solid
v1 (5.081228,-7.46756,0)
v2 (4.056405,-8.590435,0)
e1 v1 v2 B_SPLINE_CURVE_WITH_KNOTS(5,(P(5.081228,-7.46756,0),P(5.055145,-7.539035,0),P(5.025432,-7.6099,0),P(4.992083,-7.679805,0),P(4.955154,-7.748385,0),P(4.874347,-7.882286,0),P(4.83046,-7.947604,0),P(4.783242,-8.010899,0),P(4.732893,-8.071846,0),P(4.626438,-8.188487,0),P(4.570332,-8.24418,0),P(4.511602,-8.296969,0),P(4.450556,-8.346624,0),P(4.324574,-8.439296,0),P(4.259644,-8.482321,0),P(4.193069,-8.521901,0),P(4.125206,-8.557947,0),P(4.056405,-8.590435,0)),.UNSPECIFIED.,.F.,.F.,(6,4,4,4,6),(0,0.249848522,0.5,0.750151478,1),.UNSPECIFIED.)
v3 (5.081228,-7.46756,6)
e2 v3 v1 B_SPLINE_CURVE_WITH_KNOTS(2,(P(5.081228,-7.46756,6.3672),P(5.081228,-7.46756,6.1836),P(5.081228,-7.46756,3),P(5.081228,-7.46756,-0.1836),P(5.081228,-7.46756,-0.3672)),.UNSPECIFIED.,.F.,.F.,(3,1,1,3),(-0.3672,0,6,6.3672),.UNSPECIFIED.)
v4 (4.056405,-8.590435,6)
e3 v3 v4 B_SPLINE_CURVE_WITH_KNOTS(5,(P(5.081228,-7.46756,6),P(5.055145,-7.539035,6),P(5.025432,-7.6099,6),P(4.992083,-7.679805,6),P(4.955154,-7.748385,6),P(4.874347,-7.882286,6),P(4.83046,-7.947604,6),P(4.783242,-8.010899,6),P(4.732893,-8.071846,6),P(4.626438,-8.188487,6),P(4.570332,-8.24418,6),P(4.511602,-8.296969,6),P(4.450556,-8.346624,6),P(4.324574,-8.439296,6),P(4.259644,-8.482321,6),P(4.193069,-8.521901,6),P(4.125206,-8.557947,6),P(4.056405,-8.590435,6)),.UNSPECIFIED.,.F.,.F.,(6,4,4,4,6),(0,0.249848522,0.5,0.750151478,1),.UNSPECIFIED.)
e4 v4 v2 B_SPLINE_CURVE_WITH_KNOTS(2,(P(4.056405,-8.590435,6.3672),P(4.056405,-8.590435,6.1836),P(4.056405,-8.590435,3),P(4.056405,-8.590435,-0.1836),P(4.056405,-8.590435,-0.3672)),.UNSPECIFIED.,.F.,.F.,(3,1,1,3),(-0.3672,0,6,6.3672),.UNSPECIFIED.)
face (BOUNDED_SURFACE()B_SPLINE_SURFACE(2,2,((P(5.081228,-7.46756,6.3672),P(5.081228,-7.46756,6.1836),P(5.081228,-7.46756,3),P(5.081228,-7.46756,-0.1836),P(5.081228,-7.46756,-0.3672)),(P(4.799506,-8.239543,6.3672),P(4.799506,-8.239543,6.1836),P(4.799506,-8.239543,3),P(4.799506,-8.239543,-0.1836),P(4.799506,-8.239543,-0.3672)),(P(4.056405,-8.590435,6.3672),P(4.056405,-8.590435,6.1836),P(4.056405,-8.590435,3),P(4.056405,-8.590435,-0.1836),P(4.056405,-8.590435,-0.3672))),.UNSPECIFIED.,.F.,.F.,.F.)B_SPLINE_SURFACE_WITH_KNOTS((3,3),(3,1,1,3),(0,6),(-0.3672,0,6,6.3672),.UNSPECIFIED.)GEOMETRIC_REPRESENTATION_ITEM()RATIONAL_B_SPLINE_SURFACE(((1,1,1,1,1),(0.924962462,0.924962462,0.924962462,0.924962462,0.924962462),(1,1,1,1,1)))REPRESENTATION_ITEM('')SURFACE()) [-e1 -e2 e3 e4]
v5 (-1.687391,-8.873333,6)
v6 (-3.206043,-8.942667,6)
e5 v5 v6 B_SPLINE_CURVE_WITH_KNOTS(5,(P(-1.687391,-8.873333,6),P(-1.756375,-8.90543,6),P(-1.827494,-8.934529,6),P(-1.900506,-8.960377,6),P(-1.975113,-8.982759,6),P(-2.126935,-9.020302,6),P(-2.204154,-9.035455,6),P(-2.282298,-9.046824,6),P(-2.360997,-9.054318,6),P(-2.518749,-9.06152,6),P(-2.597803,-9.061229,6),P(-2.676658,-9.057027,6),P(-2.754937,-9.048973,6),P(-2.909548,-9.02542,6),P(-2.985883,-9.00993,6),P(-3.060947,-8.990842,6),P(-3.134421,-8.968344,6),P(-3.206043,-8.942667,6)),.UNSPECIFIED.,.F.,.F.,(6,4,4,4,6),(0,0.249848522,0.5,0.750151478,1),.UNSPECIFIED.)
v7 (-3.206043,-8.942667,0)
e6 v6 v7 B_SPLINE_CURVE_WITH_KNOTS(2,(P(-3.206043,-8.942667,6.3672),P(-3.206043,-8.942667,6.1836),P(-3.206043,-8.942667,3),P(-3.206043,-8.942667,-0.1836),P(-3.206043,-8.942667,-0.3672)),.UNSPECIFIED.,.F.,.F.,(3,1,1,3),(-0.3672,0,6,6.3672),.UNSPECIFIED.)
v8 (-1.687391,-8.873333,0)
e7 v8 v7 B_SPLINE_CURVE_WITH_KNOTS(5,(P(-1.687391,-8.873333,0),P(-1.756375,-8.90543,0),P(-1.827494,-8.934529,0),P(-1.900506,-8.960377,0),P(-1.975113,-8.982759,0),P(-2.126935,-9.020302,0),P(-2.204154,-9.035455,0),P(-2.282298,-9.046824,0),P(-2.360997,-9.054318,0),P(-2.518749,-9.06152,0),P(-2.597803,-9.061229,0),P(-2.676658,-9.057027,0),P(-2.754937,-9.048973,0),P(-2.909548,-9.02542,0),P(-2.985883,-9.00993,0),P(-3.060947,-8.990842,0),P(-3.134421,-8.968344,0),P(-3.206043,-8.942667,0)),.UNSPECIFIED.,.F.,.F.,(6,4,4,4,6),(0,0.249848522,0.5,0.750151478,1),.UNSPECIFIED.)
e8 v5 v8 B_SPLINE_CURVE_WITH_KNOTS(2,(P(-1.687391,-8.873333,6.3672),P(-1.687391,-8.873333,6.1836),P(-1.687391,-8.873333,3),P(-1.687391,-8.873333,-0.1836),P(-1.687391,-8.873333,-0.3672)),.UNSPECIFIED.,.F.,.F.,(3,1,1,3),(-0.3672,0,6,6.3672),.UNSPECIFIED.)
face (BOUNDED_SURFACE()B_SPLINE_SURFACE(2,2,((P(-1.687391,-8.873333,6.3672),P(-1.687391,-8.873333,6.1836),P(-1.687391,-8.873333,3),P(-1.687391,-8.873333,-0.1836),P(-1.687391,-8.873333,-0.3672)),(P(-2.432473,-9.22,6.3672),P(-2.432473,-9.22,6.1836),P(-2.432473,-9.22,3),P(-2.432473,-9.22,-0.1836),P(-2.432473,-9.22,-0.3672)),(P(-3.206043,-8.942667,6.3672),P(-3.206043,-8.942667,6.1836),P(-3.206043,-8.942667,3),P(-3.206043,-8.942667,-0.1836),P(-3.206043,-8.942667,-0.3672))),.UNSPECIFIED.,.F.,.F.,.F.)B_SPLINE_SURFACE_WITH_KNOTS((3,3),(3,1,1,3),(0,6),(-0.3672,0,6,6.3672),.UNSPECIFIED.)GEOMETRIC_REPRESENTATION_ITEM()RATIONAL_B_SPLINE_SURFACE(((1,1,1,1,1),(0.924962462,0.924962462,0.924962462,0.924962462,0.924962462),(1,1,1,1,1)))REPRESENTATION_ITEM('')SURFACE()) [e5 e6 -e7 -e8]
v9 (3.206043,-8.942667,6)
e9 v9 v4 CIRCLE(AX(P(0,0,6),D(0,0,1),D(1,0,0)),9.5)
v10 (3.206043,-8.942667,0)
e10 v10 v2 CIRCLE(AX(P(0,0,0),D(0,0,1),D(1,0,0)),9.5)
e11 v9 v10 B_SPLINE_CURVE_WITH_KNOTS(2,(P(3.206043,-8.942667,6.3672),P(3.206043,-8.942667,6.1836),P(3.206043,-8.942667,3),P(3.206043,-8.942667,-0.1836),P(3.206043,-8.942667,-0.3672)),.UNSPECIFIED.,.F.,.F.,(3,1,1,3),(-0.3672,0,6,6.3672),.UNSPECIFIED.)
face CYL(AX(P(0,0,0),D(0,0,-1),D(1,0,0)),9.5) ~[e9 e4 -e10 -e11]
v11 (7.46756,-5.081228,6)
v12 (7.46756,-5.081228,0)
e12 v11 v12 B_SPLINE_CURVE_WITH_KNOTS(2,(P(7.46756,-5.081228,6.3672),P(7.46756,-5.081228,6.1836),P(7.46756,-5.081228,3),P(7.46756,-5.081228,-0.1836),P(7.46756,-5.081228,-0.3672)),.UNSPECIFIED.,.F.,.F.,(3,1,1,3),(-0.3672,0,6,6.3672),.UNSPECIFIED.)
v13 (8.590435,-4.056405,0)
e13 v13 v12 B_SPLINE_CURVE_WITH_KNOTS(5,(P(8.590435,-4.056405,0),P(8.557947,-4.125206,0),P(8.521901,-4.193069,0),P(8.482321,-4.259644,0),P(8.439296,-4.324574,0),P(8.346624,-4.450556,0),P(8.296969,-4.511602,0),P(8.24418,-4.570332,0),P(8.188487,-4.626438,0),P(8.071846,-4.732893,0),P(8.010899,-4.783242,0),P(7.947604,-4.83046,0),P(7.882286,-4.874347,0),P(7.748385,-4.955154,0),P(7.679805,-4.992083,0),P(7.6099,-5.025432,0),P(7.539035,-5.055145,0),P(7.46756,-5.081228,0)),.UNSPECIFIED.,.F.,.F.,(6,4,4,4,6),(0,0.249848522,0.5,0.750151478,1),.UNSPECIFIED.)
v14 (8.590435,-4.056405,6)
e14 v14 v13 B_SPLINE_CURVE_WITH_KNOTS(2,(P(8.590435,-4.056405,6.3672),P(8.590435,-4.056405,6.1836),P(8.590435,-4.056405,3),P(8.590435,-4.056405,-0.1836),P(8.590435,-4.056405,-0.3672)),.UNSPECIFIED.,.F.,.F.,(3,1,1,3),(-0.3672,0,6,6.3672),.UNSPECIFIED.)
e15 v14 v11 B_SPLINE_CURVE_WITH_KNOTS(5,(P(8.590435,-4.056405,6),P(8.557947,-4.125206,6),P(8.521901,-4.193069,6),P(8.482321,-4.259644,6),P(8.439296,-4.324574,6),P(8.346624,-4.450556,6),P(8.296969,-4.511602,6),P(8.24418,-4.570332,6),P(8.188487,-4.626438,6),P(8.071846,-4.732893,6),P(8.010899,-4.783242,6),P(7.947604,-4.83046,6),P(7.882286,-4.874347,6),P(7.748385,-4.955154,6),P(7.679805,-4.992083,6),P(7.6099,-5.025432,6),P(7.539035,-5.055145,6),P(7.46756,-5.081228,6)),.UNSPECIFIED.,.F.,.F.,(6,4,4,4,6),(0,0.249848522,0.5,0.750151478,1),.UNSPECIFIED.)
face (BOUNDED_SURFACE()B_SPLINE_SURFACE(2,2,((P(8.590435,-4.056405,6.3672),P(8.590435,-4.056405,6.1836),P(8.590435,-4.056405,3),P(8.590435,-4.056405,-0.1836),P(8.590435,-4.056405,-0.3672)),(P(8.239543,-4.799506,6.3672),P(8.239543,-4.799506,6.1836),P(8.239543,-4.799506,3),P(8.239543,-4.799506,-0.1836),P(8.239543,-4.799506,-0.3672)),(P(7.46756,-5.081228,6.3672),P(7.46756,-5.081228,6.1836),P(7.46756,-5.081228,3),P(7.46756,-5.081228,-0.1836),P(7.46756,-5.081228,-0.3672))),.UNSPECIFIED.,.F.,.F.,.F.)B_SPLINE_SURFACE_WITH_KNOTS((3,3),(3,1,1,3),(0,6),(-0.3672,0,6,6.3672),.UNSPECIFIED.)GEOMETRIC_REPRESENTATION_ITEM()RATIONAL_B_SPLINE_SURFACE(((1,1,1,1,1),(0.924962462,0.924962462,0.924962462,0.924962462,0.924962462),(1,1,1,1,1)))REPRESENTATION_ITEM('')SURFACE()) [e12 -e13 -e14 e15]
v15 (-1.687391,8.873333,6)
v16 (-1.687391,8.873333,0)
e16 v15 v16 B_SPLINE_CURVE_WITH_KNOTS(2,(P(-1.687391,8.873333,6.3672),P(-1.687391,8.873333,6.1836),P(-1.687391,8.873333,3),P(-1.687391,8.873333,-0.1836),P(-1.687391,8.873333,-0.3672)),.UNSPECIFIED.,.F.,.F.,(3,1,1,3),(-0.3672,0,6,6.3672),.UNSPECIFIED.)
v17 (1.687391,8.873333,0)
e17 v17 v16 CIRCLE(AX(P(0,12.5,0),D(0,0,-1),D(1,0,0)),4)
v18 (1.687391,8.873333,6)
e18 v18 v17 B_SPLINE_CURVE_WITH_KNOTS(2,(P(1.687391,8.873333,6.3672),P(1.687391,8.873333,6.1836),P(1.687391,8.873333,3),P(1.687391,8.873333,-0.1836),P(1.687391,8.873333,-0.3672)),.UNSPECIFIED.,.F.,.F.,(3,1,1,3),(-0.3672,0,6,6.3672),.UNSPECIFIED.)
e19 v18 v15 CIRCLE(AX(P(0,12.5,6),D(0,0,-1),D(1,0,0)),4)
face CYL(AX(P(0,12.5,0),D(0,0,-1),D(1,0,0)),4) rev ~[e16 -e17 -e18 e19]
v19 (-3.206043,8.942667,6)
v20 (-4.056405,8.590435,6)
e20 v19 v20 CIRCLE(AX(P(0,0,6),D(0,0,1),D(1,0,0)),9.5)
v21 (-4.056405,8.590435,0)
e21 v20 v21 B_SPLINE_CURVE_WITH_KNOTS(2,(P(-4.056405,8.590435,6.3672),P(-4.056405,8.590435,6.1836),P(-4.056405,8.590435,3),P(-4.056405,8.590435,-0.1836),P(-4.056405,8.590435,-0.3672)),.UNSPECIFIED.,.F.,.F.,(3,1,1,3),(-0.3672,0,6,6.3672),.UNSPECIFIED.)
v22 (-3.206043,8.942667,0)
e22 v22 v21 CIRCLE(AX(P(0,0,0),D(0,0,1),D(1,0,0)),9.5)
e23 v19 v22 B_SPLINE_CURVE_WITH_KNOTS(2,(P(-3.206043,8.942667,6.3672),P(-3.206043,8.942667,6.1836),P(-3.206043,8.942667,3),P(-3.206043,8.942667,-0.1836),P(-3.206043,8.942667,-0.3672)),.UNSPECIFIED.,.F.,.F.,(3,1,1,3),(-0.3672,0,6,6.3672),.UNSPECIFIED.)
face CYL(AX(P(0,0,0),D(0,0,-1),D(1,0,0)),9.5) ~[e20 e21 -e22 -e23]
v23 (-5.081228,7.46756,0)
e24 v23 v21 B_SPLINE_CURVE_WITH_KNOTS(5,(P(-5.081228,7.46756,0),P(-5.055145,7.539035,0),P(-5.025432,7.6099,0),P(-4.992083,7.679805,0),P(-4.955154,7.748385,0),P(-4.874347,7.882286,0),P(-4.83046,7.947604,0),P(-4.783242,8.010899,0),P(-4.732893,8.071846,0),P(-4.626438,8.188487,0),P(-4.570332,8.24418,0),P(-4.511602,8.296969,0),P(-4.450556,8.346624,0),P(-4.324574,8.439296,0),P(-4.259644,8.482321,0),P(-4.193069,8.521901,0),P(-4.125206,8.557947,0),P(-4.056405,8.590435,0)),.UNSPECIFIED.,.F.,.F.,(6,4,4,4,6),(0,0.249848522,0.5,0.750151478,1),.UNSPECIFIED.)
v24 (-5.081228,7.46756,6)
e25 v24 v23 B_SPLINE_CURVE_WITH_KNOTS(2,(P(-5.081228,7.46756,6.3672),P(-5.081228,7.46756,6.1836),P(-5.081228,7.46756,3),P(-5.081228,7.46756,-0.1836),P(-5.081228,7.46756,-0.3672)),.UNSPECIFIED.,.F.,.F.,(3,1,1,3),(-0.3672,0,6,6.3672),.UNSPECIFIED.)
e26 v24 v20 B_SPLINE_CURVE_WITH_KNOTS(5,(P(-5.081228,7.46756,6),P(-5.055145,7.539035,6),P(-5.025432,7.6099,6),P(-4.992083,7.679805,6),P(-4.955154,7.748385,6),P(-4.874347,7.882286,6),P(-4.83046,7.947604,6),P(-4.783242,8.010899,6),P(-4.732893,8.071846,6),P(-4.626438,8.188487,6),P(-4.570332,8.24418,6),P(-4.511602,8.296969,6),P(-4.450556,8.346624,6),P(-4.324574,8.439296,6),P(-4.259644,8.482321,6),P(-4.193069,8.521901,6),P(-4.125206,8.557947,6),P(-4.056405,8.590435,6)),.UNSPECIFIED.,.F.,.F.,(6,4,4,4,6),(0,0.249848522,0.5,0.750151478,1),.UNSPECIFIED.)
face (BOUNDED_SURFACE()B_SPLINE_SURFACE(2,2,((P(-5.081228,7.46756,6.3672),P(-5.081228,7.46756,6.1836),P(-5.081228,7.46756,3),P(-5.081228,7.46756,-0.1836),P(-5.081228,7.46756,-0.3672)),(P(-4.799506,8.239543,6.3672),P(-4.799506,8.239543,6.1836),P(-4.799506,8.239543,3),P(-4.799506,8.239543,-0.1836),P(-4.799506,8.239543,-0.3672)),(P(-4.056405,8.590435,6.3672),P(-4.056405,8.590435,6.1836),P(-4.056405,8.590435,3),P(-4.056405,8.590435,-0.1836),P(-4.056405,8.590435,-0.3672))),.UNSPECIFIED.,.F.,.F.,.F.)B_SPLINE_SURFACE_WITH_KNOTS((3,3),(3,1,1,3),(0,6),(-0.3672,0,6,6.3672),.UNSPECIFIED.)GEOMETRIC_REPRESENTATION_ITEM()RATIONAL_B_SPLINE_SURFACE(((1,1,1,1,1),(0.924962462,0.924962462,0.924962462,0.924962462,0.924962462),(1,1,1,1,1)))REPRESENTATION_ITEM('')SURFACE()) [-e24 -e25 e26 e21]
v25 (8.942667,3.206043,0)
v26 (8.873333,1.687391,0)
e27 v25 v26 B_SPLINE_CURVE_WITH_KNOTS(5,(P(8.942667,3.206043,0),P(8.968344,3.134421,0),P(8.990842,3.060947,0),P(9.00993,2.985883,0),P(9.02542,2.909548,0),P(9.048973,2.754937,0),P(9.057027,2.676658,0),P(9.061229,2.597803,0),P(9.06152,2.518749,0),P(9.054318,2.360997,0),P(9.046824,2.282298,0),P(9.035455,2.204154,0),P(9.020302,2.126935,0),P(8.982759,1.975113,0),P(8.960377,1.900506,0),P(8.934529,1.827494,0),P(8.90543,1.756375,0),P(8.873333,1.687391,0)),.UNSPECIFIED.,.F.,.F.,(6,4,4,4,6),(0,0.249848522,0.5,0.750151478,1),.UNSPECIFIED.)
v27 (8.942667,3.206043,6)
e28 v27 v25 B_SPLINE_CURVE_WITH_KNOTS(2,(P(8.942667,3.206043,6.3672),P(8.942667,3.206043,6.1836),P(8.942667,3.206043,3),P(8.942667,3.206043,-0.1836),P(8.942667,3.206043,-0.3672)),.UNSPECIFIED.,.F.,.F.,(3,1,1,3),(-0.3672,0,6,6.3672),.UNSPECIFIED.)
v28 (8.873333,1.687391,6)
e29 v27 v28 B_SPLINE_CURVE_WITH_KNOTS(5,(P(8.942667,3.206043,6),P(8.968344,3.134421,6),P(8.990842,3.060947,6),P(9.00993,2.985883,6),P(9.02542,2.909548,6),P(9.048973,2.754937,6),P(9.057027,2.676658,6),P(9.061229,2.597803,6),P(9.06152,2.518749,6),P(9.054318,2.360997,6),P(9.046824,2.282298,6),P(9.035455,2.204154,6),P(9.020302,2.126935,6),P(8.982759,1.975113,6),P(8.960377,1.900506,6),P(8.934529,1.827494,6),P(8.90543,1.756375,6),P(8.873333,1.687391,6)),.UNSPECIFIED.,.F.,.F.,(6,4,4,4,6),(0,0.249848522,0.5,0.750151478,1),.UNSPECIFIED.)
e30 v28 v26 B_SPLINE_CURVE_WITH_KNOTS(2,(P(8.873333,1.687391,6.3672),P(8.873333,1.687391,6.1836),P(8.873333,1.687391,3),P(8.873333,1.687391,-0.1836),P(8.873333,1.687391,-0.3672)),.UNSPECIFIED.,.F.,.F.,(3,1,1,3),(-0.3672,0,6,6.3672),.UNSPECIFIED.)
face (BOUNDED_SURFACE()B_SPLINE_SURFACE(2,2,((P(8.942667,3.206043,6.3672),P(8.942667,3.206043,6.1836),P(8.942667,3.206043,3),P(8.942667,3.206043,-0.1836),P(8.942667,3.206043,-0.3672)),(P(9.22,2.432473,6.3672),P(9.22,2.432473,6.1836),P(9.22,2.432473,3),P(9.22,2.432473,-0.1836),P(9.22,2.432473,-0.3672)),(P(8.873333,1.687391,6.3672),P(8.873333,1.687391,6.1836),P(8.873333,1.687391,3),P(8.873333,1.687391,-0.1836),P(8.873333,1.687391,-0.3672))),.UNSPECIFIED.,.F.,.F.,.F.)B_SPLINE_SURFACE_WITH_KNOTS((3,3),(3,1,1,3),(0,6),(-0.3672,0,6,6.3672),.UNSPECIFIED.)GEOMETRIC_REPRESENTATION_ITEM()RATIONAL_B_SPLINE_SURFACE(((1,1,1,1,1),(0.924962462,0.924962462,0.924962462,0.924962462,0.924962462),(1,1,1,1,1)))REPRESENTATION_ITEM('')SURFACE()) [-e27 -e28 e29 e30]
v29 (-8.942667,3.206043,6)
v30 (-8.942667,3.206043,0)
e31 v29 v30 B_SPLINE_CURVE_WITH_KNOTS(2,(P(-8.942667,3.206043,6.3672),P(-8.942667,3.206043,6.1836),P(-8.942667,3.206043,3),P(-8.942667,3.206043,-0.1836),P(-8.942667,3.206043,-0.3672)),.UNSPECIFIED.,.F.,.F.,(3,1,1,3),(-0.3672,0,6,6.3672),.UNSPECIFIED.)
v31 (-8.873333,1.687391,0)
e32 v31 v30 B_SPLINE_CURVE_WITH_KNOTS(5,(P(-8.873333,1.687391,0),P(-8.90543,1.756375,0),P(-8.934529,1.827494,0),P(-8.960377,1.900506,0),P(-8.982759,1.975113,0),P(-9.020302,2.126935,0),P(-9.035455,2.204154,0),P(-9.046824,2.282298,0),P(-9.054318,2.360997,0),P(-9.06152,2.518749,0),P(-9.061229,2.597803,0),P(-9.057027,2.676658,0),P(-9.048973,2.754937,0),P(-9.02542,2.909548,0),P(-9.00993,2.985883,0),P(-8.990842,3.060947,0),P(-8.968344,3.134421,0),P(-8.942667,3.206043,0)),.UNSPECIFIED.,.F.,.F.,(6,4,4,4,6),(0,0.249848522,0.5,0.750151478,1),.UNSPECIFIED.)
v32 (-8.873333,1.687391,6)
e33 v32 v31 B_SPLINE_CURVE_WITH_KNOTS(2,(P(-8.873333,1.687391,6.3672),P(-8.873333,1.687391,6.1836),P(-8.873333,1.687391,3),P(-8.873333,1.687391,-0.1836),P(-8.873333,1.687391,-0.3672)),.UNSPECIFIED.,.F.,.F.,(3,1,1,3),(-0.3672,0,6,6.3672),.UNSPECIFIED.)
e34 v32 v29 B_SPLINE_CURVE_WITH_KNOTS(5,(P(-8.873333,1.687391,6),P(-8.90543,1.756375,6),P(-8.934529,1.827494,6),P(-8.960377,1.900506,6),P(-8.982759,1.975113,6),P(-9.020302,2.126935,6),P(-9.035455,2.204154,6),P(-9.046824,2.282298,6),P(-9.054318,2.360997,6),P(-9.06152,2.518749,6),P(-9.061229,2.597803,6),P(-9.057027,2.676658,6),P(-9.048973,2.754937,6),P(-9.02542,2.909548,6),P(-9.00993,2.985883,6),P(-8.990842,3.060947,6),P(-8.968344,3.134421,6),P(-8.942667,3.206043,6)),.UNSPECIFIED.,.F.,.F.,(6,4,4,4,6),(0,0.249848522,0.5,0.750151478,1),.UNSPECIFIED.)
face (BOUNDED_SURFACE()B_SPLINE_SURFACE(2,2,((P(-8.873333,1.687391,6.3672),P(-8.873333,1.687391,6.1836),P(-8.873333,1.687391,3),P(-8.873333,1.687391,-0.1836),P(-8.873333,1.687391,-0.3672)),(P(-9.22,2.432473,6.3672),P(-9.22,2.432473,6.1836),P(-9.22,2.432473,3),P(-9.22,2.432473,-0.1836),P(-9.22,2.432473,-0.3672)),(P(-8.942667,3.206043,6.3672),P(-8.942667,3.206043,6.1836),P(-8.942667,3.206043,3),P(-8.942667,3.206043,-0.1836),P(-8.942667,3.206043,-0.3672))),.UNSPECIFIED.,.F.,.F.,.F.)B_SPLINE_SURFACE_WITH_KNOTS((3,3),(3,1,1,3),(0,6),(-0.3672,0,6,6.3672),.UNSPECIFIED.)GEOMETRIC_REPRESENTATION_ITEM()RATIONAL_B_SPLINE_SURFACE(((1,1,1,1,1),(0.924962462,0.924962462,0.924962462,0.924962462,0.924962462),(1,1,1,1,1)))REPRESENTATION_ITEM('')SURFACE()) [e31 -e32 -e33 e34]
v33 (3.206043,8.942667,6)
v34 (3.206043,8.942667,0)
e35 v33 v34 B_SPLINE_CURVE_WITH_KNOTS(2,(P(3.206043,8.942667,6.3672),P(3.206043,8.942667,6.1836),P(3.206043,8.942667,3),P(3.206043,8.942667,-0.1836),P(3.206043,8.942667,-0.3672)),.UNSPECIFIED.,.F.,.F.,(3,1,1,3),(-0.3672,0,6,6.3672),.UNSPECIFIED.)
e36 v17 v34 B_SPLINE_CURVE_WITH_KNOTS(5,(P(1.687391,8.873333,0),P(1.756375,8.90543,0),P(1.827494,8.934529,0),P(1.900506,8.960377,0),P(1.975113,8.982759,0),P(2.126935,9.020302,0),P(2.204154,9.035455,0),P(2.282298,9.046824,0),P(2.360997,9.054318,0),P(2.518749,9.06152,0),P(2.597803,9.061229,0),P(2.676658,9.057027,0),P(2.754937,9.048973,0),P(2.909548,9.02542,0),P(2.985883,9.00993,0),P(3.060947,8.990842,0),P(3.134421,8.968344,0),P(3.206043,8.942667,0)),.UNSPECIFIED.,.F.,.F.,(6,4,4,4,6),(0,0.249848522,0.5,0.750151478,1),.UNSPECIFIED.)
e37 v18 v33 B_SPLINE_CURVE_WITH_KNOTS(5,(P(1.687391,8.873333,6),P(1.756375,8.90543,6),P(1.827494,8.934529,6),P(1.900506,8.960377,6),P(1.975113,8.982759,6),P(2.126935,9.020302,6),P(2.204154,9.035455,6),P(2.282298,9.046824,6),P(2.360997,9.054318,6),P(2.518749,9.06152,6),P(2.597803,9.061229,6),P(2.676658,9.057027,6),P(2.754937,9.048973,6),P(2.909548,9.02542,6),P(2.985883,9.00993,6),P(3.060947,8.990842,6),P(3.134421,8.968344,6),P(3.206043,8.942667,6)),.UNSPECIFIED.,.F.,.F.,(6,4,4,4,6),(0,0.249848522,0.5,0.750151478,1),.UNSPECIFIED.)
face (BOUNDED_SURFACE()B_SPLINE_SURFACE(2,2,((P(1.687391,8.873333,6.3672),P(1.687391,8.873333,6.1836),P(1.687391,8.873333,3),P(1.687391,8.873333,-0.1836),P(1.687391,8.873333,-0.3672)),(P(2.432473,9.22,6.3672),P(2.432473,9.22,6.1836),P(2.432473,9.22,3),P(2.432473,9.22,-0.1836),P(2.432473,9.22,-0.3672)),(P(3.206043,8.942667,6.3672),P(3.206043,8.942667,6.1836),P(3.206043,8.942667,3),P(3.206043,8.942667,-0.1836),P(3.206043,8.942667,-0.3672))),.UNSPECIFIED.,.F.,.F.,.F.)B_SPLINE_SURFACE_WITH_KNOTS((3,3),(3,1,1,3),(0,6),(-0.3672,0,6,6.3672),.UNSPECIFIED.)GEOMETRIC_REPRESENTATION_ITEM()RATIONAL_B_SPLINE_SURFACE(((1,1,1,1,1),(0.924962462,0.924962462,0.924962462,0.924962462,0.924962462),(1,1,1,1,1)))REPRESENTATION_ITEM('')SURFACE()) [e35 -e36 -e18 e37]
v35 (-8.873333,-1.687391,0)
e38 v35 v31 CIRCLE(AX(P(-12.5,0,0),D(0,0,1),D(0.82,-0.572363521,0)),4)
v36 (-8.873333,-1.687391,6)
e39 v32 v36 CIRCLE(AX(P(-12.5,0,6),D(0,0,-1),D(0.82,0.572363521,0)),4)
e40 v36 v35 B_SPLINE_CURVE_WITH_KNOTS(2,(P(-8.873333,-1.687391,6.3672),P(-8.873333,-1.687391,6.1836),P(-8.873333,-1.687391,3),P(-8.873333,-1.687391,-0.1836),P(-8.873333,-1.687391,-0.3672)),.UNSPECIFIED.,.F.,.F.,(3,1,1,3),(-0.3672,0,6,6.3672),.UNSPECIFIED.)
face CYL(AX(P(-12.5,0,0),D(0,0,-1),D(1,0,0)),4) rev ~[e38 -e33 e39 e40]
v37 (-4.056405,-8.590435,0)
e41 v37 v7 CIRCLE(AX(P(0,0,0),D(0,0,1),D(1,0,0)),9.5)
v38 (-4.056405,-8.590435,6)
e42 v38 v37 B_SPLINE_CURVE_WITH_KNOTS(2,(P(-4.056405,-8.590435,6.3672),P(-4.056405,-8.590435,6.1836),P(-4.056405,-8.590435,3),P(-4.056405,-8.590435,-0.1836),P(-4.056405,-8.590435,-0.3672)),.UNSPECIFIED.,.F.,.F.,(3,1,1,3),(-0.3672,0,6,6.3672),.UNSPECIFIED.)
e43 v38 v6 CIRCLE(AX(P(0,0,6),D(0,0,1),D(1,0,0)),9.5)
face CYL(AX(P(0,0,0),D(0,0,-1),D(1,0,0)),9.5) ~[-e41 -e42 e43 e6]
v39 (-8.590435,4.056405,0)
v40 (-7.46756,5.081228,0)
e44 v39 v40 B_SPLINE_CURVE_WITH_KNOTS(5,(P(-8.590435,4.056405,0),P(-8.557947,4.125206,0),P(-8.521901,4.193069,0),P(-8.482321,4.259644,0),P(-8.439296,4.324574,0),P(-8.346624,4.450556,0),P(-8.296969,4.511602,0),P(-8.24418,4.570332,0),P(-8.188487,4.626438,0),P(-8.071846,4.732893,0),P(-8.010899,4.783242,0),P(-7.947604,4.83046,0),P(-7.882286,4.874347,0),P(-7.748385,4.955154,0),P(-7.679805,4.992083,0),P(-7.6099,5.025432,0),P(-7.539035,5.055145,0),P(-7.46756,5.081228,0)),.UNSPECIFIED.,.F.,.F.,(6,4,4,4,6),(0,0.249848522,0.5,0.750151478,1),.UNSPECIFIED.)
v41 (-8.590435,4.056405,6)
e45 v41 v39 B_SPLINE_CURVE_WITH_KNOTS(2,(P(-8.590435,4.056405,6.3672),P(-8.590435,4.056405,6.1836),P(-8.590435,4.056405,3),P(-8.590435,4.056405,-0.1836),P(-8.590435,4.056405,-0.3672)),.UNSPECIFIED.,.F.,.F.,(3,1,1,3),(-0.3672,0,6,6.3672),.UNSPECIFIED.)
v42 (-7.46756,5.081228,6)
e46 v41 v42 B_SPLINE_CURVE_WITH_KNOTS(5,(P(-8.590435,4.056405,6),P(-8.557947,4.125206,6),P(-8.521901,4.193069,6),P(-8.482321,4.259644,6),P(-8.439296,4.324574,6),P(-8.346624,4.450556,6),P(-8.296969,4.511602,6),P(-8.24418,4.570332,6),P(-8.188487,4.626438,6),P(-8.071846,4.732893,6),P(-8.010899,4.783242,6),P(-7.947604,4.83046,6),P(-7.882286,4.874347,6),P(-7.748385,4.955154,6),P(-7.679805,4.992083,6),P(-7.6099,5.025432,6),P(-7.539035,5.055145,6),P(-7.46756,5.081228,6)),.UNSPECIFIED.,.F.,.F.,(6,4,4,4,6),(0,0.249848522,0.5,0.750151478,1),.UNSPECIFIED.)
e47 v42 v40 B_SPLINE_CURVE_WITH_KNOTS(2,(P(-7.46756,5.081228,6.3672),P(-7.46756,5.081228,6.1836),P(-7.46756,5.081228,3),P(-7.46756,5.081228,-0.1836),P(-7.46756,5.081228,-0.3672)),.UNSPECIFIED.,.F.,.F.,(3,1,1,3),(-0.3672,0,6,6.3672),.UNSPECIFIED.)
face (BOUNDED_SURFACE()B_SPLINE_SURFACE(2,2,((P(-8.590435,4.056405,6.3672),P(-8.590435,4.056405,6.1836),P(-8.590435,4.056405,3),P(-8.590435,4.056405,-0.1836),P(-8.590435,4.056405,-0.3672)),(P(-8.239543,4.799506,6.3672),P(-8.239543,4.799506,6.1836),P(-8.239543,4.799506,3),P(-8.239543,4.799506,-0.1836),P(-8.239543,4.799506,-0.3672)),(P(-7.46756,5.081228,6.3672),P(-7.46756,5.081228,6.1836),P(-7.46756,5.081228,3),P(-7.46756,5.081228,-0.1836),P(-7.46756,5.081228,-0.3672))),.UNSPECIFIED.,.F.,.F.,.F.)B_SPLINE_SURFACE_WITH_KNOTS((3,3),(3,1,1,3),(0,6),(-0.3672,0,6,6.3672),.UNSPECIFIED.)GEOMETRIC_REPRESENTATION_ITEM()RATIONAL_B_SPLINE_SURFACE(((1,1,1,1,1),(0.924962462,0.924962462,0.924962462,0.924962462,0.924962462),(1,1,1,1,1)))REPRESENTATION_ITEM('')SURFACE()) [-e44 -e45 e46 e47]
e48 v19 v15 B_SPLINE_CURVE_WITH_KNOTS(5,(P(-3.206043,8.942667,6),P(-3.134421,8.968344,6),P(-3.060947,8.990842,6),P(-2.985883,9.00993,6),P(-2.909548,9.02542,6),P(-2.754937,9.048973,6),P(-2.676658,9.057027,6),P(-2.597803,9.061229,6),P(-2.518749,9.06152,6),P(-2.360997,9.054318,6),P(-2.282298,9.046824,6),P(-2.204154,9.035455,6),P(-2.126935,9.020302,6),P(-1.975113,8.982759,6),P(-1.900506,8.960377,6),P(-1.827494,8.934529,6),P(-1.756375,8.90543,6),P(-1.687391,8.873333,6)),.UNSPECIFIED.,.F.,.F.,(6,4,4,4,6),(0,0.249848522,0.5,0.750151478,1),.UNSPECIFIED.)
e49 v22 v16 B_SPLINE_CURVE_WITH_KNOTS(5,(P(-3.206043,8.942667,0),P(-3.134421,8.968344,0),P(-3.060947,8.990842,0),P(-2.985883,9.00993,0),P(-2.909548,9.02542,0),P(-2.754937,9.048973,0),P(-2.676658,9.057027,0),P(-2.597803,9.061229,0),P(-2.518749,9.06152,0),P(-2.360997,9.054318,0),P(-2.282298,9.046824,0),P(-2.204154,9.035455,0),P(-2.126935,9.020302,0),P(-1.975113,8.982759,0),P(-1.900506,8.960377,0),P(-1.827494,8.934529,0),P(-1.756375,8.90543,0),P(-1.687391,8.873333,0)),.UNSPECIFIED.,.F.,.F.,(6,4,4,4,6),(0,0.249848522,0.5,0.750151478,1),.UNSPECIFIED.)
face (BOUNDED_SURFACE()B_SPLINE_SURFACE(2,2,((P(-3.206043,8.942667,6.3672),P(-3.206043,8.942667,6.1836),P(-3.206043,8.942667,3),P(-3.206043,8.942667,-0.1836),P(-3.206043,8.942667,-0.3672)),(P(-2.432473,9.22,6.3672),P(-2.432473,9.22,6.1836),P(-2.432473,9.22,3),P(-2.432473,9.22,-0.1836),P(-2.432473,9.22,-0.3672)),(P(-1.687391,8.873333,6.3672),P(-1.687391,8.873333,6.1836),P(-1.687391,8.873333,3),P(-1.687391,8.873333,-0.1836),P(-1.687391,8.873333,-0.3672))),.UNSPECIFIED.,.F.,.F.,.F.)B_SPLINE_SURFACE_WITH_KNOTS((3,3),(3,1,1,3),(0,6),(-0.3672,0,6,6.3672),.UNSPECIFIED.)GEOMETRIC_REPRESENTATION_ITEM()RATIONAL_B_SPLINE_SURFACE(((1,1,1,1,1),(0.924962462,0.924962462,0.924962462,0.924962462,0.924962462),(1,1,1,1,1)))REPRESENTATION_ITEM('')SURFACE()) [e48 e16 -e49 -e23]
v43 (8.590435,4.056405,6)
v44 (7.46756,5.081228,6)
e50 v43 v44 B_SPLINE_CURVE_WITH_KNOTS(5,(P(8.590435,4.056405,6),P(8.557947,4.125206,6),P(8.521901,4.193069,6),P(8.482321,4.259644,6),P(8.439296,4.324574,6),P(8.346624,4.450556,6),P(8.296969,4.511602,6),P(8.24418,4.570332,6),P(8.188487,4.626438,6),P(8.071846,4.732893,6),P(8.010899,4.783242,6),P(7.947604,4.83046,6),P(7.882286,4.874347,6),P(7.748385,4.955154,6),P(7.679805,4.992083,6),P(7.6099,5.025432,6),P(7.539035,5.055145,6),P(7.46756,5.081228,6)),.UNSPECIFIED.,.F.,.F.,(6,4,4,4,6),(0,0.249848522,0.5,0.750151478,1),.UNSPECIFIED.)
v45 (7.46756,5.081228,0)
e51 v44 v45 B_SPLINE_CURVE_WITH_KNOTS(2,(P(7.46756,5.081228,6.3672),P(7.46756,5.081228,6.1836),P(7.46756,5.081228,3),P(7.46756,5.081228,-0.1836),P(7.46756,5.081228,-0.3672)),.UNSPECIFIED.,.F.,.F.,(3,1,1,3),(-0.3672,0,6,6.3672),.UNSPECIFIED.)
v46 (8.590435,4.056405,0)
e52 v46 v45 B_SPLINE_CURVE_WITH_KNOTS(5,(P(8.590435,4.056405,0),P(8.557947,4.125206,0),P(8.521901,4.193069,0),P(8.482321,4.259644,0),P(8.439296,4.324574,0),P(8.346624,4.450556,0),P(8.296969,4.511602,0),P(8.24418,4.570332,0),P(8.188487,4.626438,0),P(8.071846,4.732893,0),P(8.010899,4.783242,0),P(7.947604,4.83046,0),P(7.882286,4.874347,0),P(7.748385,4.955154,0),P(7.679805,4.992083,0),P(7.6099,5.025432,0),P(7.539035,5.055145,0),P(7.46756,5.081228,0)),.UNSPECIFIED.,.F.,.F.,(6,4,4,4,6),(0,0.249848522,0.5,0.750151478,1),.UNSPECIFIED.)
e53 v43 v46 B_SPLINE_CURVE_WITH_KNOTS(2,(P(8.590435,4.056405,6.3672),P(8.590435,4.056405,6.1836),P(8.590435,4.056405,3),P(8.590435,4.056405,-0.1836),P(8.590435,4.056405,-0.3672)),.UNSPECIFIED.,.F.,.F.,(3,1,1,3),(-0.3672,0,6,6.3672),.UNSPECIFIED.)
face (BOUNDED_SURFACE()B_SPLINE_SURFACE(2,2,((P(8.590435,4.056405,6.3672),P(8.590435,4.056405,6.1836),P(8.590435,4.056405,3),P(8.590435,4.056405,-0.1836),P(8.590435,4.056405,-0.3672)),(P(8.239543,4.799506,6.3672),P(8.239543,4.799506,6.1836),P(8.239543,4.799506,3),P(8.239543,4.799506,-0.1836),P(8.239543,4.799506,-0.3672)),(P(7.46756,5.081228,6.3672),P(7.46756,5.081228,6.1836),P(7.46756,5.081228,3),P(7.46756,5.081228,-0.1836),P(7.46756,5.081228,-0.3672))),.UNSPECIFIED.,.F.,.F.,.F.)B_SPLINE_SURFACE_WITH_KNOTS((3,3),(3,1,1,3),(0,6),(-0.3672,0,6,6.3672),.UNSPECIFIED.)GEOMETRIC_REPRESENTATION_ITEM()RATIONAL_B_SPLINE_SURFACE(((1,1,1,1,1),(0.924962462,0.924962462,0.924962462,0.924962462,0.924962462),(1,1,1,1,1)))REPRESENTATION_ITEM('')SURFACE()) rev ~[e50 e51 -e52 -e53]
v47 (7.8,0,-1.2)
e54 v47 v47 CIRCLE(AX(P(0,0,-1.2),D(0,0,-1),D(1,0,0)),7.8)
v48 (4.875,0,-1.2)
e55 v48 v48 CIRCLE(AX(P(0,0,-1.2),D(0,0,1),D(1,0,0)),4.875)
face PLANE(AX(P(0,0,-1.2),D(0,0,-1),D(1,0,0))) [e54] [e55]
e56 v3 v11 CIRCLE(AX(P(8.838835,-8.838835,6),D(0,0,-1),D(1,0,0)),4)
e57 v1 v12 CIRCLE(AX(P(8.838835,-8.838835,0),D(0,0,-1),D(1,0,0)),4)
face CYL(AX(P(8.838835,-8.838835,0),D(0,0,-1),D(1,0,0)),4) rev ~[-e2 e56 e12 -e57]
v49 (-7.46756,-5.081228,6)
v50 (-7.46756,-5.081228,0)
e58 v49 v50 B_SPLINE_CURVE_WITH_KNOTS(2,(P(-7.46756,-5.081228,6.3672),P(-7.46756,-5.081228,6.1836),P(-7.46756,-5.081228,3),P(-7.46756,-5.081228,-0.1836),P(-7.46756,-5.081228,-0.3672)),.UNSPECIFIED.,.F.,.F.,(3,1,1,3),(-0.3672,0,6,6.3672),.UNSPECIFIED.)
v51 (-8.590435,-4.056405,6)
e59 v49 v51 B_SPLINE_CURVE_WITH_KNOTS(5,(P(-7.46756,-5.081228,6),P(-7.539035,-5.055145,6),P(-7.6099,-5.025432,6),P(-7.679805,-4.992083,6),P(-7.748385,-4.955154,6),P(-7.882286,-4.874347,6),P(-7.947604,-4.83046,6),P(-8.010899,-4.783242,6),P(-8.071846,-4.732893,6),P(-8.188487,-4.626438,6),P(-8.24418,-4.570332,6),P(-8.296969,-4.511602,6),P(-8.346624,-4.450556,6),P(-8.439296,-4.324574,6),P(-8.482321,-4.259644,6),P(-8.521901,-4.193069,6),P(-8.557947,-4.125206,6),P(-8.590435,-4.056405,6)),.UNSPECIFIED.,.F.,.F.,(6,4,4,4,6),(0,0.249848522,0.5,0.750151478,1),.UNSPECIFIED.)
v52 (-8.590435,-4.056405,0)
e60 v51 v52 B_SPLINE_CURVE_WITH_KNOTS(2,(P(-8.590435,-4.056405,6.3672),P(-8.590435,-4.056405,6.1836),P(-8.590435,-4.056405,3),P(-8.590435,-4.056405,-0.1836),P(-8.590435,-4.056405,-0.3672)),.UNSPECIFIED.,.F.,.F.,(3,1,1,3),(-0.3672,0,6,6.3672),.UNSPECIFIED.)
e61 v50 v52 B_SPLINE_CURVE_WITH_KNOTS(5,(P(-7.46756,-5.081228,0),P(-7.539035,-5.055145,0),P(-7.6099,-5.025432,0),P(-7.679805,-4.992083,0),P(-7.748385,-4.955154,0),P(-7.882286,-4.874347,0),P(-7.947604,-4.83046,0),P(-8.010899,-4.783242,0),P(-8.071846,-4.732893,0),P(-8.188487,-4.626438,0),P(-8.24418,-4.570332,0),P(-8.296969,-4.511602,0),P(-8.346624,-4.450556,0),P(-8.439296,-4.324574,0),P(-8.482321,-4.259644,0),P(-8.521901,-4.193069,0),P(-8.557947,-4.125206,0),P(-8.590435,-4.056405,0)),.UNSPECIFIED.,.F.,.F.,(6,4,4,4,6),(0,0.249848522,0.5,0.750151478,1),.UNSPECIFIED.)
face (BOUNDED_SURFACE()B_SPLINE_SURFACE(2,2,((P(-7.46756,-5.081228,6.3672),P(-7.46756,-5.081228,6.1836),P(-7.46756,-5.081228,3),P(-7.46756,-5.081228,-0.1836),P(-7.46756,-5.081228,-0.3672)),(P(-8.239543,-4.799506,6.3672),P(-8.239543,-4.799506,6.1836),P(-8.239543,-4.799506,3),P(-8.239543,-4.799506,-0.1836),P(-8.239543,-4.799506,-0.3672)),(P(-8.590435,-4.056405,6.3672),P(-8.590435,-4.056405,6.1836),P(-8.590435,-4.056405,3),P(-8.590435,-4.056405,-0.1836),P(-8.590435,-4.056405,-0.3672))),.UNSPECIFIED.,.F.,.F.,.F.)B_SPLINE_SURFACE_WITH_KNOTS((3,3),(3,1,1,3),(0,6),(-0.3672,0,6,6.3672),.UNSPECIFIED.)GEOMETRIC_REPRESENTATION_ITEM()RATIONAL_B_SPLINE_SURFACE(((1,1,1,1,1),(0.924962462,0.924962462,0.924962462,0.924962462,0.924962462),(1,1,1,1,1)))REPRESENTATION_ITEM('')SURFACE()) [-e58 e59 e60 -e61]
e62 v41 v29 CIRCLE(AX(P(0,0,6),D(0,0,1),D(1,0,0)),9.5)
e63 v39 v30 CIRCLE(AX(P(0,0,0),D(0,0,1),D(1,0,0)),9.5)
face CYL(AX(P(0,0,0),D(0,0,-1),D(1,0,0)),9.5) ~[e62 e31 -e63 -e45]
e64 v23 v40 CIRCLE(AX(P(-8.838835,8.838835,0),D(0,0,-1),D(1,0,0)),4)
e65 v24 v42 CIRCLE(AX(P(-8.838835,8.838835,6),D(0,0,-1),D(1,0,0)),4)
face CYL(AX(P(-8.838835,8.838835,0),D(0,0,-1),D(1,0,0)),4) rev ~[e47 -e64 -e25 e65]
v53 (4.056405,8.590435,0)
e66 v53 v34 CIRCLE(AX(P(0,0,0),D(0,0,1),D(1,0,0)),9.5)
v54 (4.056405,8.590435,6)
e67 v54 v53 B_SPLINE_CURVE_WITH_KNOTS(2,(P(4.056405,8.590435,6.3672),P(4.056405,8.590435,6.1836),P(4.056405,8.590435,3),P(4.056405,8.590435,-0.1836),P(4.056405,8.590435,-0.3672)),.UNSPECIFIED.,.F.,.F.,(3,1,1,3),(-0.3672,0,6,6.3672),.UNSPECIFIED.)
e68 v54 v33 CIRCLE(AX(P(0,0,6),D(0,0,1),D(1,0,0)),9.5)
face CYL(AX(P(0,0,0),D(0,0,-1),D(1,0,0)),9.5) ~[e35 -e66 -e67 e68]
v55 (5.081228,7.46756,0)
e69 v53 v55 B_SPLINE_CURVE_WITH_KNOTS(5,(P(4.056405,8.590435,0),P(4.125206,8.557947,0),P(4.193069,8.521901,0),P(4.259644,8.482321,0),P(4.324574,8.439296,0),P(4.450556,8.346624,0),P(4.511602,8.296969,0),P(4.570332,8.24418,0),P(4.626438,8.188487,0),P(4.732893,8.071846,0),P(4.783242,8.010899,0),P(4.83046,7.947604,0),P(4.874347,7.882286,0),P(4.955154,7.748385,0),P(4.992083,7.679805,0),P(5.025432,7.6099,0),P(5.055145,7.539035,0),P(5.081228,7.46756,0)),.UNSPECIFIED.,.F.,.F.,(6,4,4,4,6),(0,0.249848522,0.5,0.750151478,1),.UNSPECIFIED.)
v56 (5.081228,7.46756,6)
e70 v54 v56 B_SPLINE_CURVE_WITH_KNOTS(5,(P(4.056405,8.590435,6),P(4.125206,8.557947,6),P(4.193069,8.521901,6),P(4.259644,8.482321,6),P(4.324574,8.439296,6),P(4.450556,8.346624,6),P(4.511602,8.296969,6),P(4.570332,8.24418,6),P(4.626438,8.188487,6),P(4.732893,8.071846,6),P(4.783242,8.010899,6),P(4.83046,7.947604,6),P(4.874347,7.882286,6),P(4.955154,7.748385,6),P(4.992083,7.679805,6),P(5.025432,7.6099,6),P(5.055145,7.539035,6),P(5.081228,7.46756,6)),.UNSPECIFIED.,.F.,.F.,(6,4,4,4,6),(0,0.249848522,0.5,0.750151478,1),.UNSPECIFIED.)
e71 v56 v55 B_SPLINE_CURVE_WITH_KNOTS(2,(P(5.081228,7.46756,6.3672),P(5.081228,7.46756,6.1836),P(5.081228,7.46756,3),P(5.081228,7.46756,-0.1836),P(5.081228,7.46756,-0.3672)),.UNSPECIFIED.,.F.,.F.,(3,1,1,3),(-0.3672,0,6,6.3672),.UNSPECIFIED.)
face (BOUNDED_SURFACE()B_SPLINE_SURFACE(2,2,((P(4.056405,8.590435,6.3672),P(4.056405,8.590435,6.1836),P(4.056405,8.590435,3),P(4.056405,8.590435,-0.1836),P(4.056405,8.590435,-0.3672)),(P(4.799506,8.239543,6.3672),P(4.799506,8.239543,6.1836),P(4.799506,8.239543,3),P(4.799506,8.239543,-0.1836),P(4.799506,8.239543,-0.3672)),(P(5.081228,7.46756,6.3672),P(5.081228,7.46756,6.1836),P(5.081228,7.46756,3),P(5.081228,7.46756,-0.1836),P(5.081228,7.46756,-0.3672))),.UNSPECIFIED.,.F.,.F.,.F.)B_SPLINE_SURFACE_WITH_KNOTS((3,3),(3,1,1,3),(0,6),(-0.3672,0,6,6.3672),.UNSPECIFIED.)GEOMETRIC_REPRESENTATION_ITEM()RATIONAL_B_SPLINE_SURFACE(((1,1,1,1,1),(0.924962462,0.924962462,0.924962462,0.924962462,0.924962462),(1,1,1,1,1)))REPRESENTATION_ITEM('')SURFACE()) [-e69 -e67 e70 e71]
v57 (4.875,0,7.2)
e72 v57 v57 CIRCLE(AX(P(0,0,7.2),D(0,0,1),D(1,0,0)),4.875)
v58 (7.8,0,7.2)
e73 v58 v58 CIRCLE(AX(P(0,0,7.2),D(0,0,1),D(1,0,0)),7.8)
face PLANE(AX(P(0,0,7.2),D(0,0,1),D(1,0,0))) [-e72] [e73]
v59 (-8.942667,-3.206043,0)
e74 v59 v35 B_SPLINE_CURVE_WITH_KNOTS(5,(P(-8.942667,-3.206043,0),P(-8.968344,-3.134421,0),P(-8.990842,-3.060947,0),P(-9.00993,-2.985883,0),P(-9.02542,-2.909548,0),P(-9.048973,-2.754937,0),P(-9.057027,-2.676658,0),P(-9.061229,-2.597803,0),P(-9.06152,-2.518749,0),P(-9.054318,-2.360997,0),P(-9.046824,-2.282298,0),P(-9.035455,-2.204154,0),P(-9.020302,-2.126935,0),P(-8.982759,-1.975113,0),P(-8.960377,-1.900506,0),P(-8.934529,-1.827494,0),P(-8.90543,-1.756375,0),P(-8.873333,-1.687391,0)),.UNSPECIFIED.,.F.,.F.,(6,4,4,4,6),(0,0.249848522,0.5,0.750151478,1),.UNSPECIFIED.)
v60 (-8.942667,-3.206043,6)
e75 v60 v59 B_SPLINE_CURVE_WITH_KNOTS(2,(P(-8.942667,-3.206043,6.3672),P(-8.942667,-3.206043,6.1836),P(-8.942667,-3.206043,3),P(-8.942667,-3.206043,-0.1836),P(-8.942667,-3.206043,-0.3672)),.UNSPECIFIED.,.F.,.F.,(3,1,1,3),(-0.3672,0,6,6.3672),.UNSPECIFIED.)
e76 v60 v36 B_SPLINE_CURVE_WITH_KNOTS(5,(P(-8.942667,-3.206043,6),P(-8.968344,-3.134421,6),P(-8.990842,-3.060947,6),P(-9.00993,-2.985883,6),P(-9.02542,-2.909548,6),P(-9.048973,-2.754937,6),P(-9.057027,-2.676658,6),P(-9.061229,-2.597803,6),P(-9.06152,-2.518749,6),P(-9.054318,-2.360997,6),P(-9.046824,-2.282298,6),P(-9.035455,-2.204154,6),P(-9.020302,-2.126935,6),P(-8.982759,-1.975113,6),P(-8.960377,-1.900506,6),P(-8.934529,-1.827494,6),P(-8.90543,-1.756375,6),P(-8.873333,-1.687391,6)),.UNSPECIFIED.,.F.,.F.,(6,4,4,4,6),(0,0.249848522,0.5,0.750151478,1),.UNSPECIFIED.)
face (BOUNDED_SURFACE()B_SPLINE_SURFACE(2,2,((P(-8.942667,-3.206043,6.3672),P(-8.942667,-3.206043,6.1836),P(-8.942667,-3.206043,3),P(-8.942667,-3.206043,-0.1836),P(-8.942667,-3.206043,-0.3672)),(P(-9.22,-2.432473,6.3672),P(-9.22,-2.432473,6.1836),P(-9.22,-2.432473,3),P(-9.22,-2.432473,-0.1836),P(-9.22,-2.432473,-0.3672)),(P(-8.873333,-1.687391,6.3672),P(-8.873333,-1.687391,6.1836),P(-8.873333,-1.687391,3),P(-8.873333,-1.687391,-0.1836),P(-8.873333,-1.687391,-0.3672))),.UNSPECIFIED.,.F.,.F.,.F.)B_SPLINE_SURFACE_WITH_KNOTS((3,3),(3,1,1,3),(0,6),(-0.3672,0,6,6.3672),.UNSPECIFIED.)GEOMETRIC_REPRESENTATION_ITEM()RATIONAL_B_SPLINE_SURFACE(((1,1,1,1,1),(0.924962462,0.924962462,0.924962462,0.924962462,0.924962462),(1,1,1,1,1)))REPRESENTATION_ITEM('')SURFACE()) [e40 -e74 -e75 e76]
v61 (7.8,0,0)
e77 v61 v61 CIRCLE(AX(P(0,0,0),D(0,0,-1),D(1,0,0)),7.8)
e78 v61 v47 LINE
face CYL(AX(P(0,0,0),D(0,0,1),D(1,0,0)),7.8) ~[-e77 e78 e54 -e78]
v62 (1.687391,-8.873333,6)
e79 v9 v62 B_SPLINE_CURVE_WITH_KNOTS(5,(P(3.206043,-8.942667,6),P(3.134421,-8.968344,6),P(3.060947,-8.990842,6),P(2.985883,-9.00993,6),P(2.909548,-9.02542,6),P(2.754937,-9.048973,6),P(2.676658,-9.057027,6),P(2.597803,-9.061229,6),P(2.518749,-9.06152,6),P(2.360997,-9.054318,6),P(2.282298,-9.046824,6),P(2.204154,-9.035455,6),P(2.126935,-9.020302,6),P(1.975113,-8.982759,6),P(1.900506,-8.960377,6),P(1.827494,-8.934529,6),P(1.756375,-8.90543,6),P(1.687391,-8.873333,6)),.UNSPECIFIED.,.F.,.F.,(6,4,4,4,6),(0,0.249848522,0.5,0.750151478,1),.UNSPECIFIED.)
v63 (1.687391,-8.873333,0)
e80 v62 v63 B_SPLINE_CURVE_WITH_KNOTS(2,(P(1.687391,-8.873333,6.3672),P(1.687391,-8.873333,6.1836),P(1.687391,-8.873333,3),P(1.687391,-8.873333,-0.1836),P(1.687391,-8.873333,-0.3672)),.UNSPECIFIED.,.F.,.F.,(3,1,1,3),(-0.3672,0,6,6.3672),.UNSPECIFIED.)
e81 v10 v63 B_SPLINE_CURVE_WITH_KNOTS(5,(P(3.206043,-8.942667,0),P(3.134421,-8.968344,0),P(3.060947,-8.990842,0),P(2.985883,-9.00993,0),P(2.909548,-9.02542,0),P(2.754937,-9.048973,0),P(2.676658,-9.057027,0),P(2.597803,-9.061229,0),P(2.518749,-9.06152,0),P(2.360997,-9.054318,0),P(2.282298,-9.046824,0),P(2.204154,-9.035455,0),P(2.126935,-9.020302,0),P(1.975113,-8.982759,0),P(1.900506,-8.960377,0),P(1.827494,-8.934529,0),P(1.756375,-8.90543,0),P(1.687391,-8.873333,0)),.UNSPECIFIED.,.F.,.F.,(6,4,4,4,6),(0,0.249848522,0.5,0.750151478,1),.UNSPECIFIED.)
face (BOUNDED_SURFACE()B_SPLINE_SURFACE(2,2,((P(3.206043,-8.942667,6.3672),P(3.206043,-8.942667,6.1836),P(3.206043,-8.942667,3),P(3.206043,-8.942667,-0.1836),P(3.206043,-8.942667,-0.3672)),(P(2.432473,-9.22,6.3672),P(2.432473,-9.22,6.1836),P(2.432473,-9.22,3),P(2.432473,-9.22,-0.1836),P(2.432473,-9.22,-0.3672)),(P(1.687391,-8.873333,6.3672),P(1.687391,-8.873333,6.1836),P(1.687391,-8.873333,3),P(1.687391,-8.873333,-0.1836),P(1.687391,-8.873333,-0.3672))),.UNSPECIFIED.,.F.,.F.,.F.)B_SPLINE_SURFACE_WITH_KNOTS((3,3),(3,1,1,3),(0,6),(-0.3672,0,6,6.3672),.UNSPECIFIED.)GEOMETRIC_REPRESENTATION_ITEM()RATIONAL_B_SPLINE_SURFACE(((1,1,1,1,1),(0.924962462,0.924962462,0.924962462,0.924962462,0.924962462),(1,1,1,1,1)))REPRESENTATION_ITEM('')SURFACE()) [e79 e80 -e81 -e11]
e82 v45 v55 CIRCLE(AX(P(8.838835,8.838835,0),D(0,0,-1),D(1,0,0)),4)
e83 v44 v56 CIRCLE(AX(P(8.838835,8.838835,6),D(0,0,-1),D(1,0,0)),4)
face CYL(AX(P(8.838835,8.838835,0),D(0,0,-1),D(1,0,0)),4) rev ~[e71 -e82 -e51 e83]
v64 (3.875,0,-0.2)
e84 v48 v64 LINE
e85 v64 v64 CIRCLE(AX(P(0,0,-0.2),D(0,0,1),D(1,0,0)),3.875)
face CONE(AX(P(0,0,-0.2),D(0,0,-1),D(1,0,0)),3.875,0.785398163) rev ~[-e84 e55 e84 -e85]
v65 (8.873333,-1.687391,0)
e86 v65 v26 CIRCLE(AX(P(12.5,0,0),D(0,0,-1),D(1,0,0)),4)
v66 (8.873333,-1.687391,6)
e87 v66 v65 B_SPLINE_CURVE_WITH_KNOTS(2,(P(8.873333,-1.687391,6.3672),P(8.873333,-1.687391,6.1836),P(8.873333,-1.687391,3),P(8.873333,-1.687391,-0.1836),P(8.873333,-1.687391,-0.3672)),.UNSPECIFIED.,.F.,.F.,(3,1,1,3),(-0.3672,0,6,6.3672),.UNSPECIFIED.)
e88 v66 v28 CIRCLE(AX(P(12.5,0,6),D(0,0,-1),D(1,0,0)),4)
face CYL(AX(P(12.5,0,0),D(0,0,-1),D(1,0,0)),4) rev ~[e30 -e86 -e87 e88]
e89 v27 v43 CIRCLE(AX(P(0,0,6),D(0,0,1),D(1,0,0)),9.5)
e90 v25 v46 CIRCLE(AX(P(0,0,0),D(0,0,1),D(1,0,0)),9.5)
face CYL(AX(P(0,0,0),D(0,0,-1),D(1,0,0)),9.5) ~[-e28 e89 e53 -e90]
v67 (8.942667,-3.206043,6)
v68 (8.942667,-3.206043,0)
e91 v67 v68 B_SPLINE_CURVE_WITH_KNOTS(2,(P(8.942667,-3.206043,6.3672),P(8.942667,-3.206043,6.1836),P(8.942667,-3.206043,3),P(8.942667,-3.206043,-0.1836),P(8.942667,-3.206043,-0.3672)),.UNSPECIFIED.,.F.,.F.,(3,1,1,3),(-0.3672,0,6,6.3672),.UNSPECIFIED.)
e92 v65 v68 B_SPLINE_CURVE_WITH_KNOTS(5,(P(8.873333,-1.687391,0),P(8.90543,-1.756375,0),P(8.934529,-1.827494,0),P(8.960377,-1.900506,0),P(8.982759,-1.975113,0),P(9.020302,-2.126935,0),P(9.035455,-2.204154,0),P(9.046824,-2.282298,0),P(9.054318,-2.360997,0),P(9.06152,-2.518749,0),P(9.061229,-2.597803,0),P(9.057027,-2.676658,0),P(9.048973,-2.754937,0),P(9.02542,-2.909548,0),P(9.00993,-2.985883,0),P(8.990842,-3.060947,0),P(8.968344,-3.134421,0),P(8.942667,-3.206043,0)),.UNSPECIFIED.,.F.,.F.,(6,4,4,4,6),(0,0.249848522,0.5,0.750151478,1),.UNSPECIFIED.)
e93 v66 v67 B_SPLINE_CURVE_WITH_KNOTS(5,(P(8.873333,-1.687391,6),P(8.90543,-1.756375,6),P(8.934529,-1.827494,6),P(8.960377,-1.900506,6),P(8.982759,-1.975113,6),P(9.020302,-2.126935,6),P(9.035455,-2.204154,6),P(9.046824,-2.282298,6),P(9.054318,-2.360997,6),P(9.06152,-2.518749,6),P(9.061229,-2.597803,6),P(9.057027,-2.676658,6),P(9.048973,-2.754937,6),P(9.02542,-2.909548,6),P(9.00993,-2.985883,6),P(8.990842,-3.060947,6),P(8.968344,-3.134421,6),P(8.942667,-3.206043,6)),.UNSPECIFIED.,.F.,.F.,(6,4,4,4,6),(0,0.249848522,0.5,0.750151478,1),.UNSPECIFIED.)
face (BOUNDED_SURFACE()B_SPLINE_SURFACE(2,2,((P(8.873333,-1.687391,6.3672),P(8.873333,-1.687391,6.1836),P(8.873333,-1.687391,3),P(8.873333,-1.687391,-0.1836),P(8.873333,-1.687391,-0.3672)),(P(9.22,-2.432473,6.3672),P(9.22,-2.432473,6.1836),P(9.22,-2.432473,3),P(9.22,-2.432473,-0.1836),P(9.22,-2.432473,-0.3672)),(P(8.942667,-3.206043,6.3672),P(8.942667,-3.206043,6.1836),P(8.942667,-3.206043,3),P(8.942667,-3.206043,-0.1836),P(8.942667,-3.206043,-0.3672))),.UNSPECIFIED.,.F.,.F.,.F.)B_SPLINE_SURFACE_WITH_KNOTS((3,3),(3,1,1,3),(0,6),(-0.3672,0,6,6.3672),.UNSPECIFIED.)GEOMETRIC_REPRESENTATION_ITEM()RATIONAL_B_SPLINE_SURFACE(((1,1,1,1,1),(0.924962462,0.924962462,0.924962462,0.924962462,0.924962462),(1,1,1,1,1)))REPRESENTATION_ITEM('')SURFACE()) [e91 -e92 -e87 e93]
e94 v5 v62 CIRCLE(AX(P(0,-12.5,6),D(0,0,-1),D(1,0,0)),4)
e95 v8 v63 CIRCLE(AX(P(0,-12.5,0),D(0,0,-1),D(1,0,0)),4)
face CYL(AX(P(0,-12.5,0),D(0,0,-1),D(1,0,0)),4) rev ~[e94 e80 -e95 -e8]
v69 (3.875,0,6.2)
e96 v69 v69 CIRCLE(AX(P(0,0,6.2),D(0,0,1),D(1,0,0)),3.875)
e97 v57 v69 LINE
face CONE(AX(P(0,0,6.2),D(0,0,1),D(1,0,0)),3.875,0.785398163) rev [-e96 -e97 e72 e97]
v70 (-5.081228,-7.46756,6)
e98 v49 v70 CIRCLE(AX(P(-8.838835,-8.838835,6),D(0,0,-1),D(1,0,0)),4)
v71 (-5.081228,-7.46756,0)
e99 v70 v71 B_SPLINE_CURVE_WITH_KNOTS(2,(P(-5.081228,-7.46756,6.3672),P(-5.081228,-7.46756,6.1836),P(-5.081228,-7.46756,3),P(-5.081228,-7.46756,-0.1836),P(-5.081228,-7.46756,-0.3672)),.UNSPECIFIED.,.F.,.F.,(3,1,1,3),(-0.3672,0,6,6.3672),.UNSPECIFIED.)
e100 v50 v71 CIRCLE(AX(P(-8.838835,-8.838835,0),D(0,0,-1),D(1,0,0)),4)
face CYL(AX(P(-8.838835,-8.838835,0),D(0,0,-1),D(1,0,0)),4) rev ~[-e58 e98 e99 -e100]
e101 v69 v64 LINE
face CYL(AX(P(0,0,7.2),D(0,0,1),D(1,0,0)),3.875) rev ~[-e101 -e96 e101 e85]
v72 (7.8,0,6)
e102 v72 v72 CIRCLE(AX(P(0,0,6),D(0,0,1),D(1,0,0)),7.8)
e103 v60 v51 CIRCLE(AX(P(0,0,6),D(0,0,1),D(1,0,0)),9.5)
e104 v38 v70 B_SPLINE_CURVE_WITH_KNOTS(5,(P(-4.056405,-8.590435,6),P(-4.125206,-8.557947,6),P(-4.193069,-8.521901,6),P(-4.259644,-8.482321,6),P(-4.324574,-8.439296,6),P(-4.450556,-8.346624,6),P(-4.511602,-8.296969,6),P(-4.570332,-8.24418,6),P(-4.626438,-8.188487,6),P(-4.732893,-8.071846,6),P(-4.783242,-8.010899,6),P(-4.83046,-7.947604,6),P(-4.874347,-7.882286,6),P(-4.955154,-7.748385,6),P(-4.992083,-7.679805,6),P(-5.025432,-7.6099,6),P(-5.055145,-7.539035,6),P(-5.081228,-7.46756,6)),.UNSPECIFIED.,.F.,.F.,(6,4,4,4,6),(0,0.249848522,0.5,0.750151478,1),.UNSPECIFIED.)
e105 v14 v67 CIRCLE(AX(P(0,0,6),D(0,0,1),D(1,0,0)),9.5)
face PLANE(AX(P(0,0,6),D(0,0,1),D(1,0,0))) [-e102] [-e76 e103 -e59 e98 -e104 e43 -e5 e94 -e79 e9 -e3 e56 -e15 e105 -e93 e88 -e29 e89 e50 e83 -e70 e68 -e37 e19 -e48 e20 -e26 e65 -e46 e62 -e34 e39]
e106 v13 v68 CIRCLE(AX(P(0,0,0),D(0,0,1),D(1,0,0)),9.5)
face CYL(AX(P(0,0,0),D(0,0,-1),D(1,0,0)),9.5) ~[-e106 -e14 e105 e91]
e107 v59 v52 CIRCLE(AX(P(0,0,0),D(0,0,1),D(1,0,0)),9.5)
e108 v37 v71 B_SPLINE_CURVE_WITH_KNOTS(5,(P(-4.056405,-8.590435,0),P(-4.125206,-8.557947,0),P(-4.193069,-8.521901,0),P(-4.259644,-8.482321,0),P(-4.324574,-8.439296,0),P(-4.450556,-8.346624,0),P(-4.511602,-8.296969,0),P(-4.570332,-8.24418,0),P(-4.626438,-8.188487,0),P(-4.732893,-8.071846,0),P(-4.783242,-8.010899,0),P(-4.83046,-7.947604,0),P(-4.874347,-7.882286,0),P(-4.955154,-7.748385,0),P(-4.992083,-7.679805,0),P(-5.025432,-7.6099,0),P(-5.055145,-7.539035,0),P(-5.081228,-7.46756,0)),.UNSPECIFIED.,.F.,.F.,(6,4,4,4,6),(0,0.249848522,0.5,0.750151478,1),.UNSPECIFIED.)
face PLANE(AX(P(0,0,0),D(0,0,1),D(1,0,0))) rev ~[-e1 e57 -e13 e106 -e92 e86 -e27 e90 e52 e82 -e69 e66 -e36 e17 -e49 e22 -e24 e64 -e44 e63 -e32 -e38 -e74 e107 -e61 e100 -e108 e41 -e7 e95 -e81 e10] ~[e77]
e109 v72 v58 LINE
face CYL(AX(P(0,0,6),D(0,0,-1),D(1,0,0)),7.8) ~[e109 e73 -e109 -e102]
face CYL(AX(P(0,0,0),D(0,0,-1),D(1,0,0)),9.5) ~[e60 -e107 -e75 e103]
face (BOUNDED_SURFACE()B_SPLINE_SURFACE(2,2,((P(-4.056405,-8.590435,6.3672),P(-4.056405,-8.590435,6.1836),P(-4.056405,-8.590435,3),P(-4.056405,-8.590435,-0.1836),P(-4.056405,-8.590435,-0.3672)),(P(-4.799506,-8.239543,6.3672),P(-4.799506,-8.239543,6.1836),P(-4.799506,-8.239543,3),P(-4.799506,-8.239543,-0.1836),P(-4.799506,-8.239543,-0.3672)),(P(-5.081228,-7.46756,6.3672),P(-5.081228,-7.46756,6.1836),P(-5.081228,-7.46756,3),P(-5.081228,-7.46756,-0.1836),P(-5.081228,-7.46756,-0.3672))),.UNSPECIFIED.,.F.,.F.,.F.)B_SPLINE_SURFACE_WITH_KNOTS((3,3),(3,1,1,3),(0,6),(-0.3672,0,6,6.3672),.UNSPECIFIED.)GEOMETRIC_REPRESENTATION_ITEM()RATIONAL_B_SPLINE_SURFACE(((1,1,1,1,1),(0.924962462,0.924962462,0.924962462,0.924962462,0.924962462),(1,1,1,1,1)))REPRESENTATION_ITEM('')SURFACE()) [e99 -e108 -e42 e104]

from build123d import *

# Parameters (mm, degrees)
F0_R      = 9.5
F1_DEPTH  = 6
F2_R      = 7.8
F3_DEPTH  = 1.2
F4_R      = 7.8
F5_DEPTH  = 1.2
F6_R      = 4
F7_DEPTH  = 6
F8_R      = 2
F9_R      = 3.875
F10_DEPTH = 8.401
F11_SIZE  = 1


# Not quite as in the source:
# - the program builds the solid bodies; features that only make, move or delete a surface that nothing else refers to are left out


with BuildPart() as f1:
    # F0 (on Top) → F1 (new body)
    with BuildSketch(Plane.XY):
        Circle(F0_R)
    extrude(amount=F1_DEPTH)

    # F2 (on face) → F3 (join)
    with BuildSketch(Plane.XY.offset(6)):
        Circle(F2_R)
    extrude(amount=F3_DEPTH)

    # F4 (on face) → F5 (join)
    with BuildSketch(Plane(origin=(0, 0, 0), x_dir=(1, 0, 0), z_dir=(0, 0, -1))):
        Circle(F4_R)
    extrude(amount=F5_DEPTH)

    # F6 (on face) → F7 (cut, through all)
    with BuildSketch(Plane(origin=(0, 0, 0), x_dir=(1, 0, 0), z_dir=(0, 0, -1))):
        with Locations((0, 12.5)):
            Circle(F6_R)
        with Locations((-8.8388347648, 8.8388347648)):
            Circle(F6_R)
        with Locations((-12.5, 0)):
            Circle(F6_R)
        with Locations((-8.8388347648, -8.8388347648)):
            Circle(F6_R)
        with Locations((0, -12.5)):
            Circle(F6_R)
        with Locations((8.8388347648, -8.8388347648)):
            Circle(F6_R)
        with Locations((12.5, 0)):
            Circle(F6_R)
        with Locations((8.8388347648, 8.8388347648)):
            Circle(F6_R)
    extrude(amount=-F7_DEPTH, mode=Mode.SUBTRACT)

    # F8
    f8_edges = [f1.edges().sort_by_distance(p)[0] for p in [
        (-9.22, -2.289454, 3),
        (-9.22, 2.289454, 3),
        (-4.900636, -8.138413, 3),
        (-8.138413, -4.900636, 3),
        (-8.138413, 4.900636, 3),
        (-4.900636, 8.138413, 3),
        (-2.289454, 9.22, 3),
        (2.289454, 9.22, 3),
        (8.138413, 4.900636, 3),
        (4.900636, 8.138413, 3),
        (9.22, 2.289454, 3),
        (9.22, -2.289454, 3),
        (8.138413, -4.900636, 3),
        (4.900636, -8.138413, 3),
        (2.289454, -9.22, 3),
        (-2.289454, -9.22, 3),
    ]]
    fillet(f8_edges, radius=F8_R)

    # F9 (on face) → F10 (cut, through all)
    with BuildSketch(Plane.XY.offset(7.2)):
        Circle(F9_R)
    extrude(amount=-F10_DEPTH, mode=Mode.SUBTRACT)

    # F11
    f11_edges = [f1.edges().sort_by_distance(p)[0] for p in [
        (-3.875, 0, 7.2),
        (-3.875, 0, -1.2),
    ]]
    chamfer(f11_edges, length=F11_SIZE)


solid = f1.part
